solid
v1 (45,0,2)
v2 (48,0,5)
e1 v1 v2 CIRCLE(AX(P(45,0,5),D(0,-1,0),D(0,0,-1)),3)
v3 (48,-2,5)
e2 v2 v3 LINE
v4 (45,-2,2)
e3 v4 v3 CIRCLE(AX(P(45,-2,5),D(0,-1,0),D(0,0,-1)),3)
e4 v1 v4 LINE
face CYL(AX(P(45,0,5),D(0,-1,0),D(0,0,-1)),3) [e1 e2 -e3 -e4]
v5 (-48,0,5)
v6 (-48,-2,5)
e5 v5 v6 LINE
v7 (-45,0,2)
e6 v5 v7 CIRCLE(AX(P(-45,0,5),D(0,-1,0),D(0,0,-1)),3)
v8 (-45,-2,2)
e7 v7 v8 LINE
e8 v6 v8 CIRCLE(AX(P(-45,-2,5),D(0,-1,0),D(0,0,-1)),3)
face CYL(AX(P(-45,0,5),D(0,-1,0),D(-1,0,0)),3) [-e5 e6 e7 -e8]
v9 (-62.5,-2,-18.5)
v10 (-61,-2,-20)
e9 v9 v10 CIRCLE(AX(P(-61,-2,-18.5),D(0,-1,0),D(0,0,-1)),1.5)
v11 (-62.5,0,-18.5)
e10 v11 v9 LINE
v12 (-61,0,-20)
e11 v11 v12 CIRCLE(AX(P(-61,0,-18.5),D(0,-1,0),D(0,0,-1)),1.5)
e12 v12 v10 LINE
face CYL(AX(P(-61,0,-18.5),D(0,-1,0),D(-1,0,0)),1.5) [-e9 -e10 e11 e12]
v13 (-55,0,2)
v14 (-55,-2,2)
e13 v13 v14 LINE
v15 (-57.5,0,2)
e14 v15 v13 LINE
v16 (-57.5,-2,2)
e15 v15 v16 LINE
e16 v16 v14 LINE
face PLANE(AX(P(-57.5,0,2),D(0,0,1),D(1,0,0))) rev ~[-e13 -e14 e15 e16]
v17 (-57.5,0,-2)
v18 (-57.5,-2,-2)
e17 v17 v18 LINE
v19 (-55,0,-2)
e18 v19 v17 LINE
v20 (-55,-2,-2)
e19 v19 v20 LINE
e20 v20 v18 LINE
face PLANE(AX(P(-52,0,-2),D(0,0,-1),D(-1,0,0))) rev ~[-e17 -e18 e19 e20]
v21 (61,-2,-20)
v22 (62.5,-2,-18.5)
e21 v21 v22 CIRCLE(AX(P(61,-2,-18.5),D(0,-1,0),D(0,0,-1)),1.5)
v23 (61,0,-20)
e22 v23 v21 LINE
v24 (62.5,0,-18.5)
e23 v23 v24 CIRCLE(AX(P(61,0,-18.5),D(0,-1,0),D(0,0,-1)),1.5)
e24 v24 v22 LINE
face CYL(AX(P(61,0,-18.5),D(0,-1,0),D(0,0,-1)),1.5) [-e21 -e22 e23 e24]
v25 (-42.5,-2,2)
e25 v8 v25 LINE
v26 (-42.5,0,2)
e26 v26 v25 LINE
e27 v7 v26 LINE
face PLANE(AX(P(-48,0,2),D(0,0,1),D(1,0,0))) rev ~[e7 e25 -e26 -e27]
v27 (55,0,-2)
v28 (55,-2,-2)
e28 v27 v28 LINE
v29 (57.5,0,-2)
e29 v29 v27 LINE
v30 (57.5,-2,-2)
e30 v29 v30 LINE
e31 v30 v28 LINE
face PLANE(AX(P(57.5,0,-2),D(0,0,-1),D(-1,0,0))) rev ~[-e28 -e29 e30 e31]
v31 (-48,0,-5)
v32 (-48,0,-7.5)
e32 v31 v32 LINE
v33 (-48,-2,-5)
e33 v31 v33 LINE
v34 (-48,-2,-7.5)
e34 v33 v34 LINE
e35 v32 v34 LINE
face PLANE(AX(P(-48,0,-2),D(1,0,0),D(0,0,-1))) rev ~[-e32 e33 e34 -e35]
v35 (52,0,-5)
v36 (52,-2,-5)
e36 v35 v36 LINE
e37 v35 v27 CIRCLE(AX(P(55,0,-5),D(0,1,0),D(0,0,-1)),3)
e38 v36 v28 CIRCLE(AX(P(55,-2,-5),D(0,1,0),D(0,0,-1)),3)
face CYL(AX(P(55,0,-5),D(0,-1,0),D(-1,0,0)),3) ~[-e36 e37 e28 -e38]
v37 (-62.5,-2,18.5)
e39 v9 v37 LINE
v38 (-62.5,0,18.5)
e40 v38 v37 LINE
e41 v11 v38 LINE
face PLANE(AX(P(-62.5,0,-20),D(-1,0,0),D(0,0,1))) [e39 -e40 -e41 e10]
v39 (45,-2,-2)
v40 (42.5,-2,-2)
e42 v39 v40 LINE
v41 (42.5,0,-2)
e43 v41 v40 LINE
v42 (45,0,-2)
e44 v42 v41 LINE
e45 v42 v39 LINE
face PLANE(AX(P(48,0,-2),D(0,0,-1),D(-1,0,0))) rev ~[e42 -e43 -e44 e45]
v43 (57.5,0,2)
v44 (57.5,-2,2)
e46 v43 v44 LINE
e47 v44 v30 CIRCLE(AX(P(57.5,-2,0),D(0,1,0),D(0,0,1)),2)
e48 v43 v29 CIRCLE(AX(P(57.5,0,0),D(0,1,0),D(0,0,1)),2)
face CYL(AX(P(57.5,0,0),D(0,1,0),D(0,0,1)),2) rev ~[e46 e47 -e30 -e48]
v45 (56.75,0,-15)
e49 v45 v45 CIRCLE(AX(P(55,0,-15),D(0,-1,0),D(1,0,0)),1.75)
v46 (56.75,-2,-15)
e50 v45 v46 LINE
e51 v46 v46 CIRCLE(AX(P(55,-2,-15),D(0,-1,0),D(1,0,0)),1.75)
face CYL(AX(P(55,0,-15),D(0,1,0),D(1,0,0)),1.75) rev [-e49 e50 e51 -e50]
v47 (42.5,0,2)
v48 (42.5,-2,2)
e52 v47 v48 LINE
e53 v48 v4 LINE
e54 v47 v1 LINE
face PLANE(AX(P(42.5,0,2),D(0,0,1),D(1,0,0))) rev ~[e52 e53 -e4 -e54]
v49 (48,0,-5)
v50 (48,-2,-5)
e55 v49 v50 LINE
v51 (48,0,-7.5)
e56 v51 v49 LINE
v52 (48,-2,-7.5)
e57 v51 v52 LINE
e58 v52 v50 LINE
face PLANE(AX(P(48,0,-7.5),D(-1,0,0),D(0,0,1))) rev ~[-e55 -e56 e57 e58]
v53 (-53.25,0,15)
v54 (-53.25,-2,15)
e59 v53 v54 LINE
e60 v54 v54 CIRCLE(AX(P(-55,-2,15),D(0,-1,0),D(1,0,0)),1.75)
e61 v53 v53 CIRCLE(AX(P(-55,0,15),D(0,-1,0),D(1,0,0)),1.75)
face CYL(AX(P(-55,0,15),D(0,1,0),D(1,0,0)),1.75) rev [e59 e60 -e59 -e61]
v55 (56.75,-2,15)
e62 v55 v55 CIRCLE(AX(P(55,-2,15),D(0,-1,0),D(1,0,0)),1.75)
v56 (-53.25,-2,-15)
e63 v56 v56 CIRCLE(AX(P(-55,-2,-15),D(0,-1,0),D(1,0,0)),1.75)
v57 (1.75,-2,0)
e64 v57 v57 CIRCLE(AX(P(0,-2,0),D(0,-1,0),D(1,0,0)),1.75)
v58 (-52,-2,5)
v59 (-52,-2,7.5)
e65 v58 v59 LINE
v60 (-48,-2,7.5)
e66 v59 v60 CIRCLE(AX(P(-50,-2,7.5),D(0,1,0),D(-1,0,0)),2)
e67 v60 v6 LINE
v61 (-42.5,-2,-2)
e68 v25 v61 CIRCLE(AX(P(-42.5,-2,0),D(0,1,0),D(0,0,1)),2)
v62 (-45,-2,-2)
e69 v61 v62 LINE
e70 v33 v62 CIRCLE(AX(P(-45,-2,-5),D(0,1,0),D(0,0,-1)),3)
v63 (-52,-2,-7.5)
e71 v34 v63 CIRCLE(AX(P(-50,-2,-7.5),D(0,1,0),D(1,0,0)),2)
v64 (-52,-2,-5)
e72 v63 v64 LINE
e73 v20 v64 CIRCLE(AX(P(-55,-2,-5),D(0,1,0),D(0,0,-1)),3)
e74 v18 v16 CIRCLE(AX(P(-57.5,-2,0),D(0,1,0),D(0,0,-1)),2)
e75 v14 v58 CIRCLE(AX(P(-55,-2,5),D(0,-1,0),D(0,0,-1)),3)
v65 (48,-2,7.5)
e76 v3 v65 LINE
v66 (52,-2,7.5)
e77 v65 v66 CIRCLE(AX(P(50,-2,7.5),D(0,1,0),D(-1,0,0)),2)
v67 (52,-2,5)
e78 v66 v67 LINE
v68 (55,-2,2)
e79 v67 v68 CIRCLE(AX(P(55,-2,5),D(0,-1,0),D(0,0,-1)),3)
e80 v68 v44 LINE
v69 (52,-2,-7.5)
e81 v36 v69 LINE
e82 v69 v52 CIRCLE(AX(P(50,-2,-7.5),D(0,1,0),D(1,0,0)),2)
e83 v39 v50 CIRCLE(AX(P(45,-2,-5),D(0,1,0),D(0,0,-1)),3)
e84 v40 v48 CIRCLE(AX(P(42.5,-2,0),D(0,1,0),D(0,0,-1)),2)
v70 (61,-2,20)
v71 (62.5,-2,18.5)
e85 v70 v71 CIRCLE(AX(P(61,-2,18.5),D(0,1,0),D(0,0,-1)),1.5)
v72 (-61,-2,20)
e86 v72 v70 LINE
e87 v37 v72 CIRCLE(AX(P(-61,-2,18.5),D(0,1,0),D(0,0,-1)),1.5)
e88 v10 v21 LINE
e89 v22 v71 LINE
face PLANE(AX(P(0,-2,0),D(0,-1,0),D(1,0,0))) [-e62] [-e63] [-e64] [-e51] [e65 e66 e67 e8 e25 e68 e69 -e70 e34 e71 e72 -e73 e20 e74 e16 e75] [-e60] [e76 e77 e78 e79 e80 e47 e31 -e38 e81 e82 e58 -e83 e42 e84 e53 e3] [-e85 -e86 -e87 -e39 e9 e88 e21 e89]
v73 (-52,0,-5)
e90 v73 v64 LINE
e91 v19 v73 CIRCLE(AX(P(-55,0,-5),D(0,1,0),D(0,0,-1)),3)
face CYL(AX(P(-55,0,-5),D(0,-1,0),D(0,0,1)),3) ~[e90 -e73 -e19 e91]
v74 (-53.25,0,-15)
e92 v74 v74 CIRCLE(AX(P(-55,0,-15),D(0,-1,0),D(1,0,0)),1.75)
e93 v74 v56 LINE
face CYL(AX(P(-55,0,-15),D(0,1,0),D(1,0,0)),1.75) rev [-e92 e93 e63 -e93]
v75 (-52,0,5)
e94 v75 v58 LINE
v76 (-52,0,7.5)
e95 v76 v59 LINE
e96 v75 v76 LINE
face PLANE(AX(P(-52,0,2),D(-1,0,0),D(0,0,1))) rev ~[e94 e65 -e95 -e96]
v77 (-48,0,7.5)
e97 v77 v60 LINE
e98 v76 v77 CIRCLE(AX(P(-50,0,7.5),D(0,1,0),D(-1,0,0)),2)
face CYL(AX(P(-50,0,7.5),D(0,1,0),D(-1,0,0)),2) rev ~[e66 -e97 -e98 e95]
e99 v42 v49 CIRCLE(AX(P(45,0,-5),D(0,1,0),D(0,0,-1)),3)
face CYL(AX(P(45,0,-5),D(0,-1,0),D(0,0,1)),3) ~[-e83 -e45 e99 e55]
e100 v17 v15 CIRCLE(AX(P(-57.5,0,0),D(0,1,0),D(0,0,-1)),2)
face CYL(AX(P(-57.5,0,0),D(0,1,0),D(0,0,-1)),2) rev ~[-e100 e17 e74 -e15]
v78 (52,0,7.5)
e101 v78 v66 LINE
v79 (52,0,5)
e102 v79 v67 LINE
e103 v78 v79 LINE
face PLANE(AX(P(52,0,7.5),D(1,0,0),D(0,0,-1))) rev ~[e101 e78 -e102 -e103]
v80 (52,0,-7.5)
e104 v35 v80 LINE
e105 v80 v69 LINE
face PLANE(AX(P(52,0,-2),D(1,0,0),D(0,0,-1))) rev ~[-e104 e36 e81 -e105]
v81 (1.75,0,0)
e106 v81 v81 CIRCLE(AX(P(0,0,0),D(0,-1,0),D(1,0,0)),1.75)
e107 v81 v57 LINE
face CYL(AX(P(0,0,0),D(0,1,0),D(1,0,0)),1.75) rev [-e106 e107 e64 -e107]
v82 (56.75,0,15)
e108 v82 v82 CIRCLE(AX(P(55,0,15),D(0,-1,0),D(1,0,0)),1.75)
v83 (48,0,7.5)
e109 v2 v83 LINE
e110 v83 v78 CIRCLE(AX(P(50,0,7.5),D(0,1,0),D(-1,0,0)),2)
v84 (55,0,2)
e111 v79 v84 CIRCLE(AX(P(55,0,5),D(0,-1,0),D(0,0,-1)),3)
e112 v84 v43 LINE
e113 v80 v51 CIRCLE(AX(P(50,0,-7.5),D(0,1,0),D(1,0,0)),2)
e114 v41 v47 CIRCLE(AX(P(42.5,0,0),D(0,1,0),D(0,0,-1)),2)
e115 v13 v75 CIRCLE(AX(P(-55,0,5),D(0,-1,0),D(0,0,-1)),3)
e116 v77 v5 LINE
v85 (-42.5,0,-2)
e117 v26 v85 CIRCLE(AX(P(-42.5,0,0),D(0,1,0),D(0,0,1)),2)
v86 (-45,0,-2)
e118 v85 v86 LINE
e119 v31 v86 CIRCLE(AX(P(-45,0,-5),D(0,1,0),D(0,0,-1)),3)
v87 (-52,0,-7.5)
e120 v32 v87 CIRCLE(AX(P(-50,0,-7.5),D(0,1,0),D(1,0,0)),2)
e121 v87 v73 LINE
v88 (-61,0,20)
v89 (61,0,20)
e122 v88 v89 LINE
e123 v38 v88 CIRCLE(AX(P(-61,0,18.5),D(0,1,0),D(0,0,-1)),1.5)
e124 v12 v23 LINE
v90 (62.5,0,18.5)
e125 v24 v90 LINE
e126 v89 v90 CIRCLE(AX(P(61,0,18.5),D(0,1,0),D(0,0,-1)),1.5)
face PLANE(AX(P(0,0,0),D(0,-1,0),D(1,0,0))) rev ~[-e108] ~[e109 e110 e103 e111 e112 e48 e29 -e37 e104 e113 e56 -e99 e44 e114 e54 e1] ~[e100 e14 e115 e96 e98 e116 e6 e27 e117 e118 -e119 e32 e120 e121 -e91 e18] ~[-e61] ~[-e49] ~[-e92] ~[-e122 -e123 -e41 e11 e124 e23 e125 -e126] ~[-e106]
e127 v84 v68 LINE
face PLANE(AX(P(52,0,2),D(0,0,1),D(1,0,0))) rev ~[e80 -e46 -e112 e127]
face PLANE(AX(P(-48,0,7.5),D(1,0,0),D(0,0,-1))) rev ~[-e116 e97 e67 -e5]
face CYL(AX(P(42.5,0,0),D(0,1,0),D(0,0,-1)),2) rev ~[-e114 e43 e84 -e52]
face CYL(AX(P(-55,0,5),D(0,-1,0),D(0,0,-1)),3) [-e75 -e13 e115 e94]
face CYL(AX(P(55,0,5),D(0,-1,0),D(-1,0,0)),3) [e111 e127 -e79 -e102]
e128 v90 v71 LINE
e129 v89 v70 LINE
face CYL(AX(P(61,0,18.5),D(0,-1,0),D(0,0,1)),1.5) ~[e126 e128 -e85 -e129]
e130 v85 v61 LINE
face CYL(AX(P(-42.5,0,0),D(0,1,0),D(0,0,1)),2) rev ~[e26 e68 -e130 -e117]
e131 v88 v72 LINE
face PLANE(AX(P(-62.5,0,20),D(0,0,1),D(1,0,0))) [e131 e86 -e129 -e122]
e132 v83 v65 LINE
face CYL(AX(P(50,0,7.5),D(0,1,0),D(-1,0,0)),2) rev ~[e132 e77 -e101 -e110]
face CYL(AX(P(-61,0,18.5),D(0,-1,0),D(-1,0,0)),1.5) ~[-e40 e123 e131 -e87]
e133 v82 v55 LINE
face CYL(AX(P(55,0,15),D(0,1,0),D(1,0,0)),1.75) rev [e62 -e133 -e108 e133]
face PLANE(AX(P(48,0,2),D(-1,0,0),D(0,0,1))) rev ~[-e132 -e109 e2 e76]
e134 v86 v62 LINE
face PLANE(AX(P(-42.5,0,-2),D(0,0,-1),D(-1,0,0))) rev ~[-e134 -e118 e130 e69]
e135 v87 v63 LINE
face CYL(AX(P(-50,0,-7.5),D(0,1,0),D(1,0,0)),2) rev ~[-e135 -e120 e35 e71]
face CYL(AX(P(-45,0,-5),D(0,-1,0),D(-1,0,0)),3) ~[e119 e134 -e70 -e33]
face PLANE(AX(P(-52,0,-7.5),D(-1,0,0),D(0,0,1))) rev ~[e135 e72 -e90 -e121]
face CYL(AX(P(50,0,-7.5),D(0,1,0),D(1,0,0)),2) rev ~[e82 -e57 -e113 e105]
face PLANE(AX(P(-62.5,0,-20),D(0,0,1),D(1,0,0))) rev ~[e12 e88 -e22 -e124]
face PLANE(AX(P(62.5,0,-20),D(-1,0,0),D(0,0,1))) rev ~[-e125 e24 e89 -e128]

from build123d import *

# Parameters (mm, degrees)
F0_W     = 125
F0_H     = 40
F0_R     = 1.75
F1_DEPTH = 2
F2_R     = 1.5
F3_R     = 3


# Not quite as in the source:
# - a feature names something its author has since deleted; it is built from what else it names


with BuildPart() as f1:
    # F0 (on Front) → F1 (new body)
    with BuildSketch(Plane.XZ):
        Rectangle(F0_W, F0_H)
        with Locations((-55, -15)):
            Circle(F0_R, mode=Mode.SUBTRACT)
        with Locations((55, -15)):
            Circle(F0_R, mode=Mode.SUBTRACT)
        with BuildLine():
            Line((-57.5, 2), (-52, 2))
            Line((-52, 2), (-52, 7.5))
            ThreePointArc((-52, 7.5), (-50, 9.5), (-48, 7.5))
            Line((-48, 7.5), (-48, 2))
            Line((-48, 2), (-42.5, 2))
            ThreePointArc((-42.5, 2), (-40.5, 0), (-42.5, -2))
            Line((-42.5, -2), (-48, -2))
            Line((-48, -2), (-48, -7.5))
            ThreePointArc((-48, -7.5), (-50, -9.5), (-52, -7.5))
            Line((-52, -7.5), (-52, -2))
            Line((-52, -2), (-57.5, -2))
            ThreePointArc((-57.5, -2), (-59.5, 0), (-57.5, 2))
        make_face(mode=Mode.SUBTRACT)
        with Locations((-55, 15)):
            Circle(F0_R, mode=Mode.SUBTRACT)
        Circle(F0_R, mode=Mode.SUBTRACT)
        with BuildLine():
            Line((42.5, 2), (48, 2))
            Line((48, 2), (48, 7.5))
            ThreePointArc((48, 7.5), (50, 9.5), (52, 7.5))
            Line((52, 7.5), (52, 2))
            Line((52, 2), (57.5, 2))
            ThreePointArc((57.5, 2), (59.5, 0), (57.5, -2))
            Line((57.5, -2), (52, -2))
            Line((52, -2), (52, -7.5))
            ThreePointArc((52, -7.5), (50, -9.5), (48, -7.5))
            Line((48, -7.5), (48, -2))
            Line((48, -2), (42.5, -2))
            ThreePointArc((42.5, -2), (40.5, 0), (42.5, 2))
        make_face(mode=Mode.SUBTRACT)
        with Locations((55, 15)):
            Circle(F0_R, mode=Mode.SUBTRACT)
    extrude(amount=F1_DEPTH)

    # F2
    f2_edges = [f1.edges().sort_by_distance(p)[0] for p in [
        (-62.5, -1, 20),
        (62.5, -1, 20),
        (-62.5, -1, -20),
        (62.5, -1, -20),
    ]]
    fillet(f2_edges, radius=F2_R)

    # F3
    f3_edges = [f1.edges().sort_by_distance(p)[0] for p in [
        (-48, -1, 2),
        (-52, -1, 2),
        (-52, -1, -2),
        (-48, -1, -2),
        (52, -1, 2),
        (48, -1, 2),
        (48, -1, -2),
        (52, -1, -2),
    ]]
    fillet(f3_edges, radius=F3_R)


solid = f1.part
